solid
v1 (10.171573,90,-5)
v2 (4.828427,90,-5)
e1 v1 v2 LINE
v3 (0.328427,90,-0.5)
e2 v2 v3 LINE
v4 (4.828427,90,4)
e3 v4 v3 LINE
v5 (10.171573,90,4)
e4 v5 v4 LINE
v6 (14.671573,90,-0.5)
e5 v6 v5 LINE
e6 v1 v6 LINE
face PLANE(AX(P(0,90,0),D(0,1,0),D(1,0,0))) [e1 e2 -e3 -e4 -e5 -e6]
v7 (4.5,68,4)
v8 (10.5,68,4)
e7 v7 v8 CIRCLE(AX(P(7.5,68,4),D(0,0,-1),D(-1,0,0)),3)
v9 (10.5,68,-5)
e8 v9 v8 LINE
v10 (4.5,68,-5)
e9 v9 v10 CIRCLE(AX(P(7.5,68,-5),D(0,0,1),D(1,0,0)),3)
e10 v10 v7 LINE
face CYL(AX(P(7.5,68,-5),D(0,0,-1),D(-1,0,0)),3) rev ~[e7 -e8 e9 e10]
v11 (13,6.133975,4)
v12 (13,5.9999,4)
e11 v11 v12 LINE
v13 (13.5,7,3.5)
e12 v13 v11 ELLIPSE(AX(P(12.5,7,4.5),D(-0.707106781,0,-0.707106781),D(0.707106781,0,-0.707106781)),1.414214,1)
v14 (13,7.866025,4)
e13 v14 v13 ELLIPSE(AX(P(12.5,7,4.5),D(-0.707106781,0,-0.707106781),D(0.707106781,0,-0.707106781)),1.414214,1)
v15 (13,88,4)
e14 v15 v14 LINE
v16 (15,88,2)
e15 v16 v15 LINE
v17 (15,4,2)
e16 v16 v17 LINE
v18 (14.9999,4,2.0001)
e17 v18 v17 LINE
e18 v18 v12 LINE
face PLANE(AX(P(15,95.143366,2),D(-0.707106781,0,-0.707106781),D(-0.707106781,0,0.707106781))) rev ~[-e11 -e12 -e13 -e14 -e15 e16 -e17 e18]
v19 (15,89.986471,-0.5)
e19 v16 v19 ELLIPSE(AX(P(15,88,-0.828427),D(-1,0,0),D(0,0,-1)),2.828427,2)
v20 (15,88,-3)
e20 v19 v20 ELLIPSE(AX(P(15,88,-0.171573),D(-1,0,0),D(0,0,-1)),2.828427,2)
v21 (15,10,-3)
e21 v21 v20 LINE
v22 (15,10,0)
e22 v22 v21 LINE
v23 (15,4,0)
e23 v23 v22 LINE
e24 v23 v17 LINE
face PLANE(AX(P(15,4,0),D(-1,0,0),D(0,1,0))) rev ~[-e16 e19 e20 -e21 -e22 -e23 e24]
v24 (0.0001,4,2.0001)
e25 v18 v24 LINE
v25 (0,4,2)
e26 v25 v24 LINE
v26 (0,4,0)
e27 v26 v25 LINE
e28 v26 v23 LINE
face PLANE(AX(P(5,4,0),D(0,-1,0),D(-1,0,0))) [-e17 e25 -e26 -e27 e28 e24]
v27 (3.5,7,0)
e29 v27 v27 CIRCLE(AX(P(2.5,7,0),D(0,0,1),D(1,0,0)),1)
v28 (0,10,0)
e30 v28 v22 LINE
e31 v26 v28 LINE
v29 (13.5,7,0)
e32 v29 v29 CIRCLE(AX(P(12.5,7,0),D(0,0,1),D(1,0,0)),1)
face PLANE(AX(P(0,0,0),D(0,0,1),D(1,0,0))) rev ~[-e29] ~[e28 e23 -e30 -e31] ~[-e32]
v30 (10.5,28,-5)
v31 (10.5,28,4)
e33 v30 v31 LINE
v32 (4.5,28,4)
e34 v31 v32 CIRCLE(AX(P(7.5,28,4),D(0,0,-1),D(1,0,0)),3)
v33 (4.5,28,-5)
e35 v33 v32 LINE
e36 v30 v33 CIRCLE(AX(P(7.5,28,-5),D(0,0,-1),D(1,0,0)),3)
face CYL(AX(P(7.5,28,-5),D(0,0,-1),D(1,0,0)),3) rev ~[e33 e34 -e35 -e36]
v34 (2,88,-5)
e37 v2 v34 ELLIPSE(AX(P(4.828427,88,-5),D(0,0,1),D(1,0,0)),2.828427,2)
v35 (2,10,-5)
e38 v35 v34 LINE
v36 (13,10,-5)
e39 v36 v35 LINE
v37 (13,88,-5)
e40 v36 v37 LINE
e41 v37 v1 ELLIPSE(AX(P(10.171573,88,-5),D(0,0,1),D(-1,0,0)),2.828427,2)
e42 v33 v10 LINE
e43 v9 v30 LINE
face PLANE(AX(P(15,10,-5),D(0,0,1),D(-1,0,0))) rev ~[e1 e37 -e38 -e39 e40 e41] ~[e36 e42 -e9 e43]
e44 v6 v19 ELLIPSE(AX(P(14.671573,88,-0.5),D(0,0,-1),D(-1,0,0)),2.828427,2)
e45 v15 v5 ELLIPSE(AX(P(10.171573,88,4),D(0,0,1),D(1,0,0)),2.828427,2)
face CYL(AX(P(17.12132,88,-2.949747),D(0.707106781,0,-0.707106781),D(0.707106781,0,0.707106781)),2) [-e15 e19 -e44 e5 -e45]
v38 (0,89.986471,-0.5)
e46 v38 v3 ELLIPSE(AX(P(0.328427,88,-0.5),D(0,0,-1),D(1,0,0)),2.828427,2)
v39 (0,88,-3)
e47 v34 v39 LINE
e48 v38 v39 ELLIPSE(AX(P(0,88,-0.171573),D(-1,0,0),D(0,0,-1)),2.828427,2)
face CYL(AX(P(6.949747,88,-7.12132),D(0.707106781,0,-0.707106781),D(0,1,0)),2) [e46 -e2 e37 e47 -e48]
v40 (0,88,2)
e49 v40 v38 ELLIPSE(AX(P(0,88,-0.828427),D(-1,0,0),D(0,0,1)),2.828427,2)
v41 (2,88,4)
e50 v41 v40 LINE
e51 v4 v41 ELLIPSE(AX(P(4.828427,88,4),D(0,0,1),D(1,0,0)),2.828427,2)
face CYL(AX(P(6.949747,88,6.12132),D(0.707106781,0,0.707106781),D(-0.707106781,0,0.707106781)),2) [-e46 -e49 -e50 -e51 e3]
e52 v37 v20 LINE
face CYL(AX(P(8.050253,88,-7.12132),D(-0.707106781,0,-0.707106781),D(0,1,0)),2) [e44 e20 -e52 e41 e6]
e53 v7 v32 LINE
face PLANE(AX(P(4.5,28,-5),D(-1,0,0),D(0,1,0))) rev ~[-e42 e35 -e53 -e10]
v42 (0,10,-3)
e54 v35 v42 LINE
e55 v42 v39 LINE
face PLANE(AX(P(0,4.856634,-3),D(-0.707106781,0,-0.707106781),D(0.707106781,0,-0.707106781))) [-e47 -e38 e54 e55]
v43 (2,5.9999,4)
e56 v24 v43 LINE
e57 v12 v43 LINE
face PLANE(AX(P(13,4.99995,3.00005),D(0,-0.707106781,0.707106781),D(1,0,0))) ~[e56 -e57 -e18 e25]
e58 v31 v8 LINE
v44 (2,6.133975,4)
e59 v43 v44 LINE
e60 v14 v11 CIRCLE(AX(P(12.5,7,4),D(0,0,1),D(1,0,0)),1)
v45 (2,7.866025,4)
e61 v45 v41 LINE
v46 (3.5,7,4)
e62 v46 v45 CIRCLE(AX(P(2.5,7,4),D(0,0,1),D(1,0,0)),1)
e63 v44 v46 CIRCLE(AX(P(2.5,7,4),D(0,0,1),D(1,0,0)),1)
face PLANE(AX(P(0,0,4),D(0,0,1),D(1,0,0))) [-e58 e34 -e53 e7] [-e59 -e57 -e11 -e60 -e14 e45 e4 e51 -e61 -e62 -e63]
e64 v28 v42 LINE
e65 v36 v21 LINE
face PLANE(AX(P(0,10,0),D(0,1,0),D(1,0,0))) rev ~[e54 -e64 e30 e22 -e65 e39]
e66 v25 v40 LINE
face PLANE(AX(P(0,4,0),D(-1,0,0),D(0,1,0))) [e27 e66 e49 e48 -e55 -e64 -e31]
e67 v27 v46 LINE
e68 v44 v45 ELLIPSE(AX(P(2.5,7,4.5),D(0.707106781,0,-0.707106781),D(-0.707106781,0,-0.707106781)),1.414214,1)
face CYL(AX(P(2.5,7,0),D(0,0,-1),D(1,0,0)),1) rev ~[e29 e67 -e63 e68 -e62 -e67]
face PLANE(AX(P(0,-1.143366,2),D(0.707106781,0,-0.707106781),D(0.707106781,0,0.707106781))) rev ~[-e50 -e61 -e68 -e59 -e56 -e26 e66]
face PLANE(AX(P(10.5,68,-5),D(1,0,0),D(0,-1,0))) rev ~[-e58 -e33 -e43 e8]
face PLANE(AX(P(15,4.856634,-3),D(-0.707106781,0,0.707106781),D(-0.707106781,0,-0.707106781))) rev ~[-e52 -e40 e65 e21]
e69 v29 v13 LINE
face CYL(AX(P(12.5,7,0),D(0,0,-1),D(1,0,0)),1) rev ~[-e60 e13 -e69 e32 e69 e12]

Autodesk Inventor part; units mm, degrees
ref_plane "YZ Plane" through (0, 0, 0) normal (1, 0, 0) x (0, 1, 0)
ref_plane "XZ Plane" through (0, 0, 0) normal (0, 1, 0) x (-1, 0, 0)
ref_plane "XY Plane" through (0, 0, 0) normal (0, 0, 1) x (1, 0, 0)
sketch "Sketch1" plane through (0, 0, 0) normal (0, 0, 1) x (1, 0, 0)
  spline S0 degree 3 poles (5, 2.8134) (4.7282, 2.7718) (4.4577, 2.7171) (3.9725, 2.5829) (3.7572, 2.5096) (3.2649, 2.2994) (2.9924, 2.1483) (2.5895, 1.8431) (2.4453, 1.712) (2.3168, 1.5682) (2.1311, 1.3604) (1.976, 1.1232) (1.7525, 0.5925) (1.6905, 0.2977) (1.6905, 0) knots 0 0 0 0 0.174284 0.174284 0.317468 0.317468 0.513399 0.513399 0.635856 0.635856 0.635856 0.812785 0.812785 1 1 1 1
  line L0 (5, 2.8134) -> (5, 10)
  line L1 (0, 10) -> (5, 10)
  line L2 (0, 2.607) -> (0, 10)
  spline S1 degree 3 poles (1.5054, -1.0718) (1.0443, -0.6134) (0.6771, -0.0703) (0.2854, 0.8445) (0.1821, 1.1739) (0.0367, 1.8715) (0, 2.2339) (0, 2.607) knots 0 0 0 0 0.47732 0.47732 0.730106 0.730106 1 1 1 1
  spline S2 degree 3 poles (1.6905, -1.2645) (1.6303, -1.1989) (1.5686, -1.1346) (1.5054, -1.0718) knots 0 0 0 0 1 1 1 1
  line L3 (1.6905, 0) -> (1.6905, -1.2645)
  circle A0 centre (2.5, 7) radius 1
  circle A1 centre (12.5, 7) radius 1
  spline S3 degree 3 poles (13.3095, 0) (13.3095, 0.2448) (13.2668, 0.4921) (13.0809, 1.0308) (12.9041, 1.3201) (12.6871, 1.5639) (12.5591, 1.7077) (12.4154, 1.8388) (12.0138, 2.1444) (11.7421, 2.2958) (11.2512, 2.5065) (11.0368, 2.5799) (10.5491, 2.7158) (10.2752, 2.7712) (10, 2.8134) knots 0 0 0 0 0.154789 0.154789 0.362213 0.362213 0.362213 0.4846 0.4846 0.68042 0.68042 0.823311 0.823311 1 1 1 1
  line L4 (13.3095, -1.2645) -> (13.3095, 0)
  spline S4 degree 3 poles (13.3095, -1.2645) (13.3697, -1.1989) (13.4314, -1.1346) (13.4946, -1.0718) knots 0 0 0 0 1 1 1 1
  spline S5 degree 3 poles (15, 2.607) (15, 2.4473) (14.9933, 2.2901) (14.9258, 1.5152) (14.7659, 0.9156) (14.2513, -0.1742) (13.9111, -0.6578) (13.4946, -1.0718) knots 0 0 0 0 0.115959 0.115959 0.56908 0.56908 1 1 1 1
  line L5 (15, 2.607) -> (15, 10)
  line L6 (10, 10) -> (15, 10)
  line L7 (10, 10) -> (10, 2.8134)
  line L8 (0, 10) -> (15, 10)
  line L9 (15, 10) -> (15, 4)
  line L10 (15, 4) -> (0, 4)
  line L11 (0, 4) -> (0, 10)
  point P0 (0, 0)
  dimension "d0" = 15
  dimension "d1" = 6
extrude "Extrusion1" add sketch "Sketch1" along normal blind 4 contours L10 L2 L1 L0 | L0 L8 L7 L10 | L7 L6 L5 L10
sketch "Sketch2" plane through (0, 10, 0) normal (0, 1, 0) x (1, 0, 0)
  line L0 (15, 0) -> (0, 0) projected
  line L1 (0, 0) -> (0, -4) projected
  line L2 (15, -4) -> (0, -4) projected
  line L3 (15, 0) -> (15, -4) projected
  line L4 (15, -4) -> (0, -4) projected
  line L5 (0, -4) -> (15, -4)
  line L6 (15, -4) -> (15, 5)
  line L7 (15, 5) -> (0, 5)
  line L8 (0, 5) -> (0, -4)
  dimension "d4" = 15
  dimension "d5" = 9
extrude "Extrusion2" add sketch "Sketch2" along normal blind 80
sketch "Sketch3" plane through (15, 10, -5) normal (0, 0, -1) x (-1, 0, 0)
  line L0 (0, 0) -> (15, 0) projected
  line L1 (15, 0) -> (15, 80) projected
  line L2 (0, 80) -> (15, 80) projected
  line L3 (0, 0) -> (0, 80) projected
  line L4 (7.5, 80) -> (7.5, 38)
  line L5 (7.5, 18) -> (7.5, 58) construction
  line L6 (10.5, 18) -> (10.5, 58)
  line L7 (4.5, 58) -> (4.5, 18)
  arc A0 (4.5, 18) -> (10.5, 18) centre (7.5, 18) ccw
  arc A1 (10.5, 58) -> (4.5, 58) centre (7.5, 58) ccw
  point P0 (15, -10)
  dimension "d8" = 42
  dimension "d9" = 20
  dimension "d10" = 6
extrude "Extrusion3" cut sketch "Sketch3" against normal blind 80 contours A0 L7 A1 L6
chamfer "Chamfer1" distance 2 angle 45 4 edges at (15, 47, 4) (15, 50, -5) (0, 50, -5) (0, 47, 4)
chamfer "Chamfer2" distance 2 angle 45 1 edges at (7.5, 4, 4)
fillet "Fillet1" radius 2 4 edges at (1, 90, -4) (14, 90, -4) (14, 90, 3) (1, 90, 3)
properties part number "pen_2"
